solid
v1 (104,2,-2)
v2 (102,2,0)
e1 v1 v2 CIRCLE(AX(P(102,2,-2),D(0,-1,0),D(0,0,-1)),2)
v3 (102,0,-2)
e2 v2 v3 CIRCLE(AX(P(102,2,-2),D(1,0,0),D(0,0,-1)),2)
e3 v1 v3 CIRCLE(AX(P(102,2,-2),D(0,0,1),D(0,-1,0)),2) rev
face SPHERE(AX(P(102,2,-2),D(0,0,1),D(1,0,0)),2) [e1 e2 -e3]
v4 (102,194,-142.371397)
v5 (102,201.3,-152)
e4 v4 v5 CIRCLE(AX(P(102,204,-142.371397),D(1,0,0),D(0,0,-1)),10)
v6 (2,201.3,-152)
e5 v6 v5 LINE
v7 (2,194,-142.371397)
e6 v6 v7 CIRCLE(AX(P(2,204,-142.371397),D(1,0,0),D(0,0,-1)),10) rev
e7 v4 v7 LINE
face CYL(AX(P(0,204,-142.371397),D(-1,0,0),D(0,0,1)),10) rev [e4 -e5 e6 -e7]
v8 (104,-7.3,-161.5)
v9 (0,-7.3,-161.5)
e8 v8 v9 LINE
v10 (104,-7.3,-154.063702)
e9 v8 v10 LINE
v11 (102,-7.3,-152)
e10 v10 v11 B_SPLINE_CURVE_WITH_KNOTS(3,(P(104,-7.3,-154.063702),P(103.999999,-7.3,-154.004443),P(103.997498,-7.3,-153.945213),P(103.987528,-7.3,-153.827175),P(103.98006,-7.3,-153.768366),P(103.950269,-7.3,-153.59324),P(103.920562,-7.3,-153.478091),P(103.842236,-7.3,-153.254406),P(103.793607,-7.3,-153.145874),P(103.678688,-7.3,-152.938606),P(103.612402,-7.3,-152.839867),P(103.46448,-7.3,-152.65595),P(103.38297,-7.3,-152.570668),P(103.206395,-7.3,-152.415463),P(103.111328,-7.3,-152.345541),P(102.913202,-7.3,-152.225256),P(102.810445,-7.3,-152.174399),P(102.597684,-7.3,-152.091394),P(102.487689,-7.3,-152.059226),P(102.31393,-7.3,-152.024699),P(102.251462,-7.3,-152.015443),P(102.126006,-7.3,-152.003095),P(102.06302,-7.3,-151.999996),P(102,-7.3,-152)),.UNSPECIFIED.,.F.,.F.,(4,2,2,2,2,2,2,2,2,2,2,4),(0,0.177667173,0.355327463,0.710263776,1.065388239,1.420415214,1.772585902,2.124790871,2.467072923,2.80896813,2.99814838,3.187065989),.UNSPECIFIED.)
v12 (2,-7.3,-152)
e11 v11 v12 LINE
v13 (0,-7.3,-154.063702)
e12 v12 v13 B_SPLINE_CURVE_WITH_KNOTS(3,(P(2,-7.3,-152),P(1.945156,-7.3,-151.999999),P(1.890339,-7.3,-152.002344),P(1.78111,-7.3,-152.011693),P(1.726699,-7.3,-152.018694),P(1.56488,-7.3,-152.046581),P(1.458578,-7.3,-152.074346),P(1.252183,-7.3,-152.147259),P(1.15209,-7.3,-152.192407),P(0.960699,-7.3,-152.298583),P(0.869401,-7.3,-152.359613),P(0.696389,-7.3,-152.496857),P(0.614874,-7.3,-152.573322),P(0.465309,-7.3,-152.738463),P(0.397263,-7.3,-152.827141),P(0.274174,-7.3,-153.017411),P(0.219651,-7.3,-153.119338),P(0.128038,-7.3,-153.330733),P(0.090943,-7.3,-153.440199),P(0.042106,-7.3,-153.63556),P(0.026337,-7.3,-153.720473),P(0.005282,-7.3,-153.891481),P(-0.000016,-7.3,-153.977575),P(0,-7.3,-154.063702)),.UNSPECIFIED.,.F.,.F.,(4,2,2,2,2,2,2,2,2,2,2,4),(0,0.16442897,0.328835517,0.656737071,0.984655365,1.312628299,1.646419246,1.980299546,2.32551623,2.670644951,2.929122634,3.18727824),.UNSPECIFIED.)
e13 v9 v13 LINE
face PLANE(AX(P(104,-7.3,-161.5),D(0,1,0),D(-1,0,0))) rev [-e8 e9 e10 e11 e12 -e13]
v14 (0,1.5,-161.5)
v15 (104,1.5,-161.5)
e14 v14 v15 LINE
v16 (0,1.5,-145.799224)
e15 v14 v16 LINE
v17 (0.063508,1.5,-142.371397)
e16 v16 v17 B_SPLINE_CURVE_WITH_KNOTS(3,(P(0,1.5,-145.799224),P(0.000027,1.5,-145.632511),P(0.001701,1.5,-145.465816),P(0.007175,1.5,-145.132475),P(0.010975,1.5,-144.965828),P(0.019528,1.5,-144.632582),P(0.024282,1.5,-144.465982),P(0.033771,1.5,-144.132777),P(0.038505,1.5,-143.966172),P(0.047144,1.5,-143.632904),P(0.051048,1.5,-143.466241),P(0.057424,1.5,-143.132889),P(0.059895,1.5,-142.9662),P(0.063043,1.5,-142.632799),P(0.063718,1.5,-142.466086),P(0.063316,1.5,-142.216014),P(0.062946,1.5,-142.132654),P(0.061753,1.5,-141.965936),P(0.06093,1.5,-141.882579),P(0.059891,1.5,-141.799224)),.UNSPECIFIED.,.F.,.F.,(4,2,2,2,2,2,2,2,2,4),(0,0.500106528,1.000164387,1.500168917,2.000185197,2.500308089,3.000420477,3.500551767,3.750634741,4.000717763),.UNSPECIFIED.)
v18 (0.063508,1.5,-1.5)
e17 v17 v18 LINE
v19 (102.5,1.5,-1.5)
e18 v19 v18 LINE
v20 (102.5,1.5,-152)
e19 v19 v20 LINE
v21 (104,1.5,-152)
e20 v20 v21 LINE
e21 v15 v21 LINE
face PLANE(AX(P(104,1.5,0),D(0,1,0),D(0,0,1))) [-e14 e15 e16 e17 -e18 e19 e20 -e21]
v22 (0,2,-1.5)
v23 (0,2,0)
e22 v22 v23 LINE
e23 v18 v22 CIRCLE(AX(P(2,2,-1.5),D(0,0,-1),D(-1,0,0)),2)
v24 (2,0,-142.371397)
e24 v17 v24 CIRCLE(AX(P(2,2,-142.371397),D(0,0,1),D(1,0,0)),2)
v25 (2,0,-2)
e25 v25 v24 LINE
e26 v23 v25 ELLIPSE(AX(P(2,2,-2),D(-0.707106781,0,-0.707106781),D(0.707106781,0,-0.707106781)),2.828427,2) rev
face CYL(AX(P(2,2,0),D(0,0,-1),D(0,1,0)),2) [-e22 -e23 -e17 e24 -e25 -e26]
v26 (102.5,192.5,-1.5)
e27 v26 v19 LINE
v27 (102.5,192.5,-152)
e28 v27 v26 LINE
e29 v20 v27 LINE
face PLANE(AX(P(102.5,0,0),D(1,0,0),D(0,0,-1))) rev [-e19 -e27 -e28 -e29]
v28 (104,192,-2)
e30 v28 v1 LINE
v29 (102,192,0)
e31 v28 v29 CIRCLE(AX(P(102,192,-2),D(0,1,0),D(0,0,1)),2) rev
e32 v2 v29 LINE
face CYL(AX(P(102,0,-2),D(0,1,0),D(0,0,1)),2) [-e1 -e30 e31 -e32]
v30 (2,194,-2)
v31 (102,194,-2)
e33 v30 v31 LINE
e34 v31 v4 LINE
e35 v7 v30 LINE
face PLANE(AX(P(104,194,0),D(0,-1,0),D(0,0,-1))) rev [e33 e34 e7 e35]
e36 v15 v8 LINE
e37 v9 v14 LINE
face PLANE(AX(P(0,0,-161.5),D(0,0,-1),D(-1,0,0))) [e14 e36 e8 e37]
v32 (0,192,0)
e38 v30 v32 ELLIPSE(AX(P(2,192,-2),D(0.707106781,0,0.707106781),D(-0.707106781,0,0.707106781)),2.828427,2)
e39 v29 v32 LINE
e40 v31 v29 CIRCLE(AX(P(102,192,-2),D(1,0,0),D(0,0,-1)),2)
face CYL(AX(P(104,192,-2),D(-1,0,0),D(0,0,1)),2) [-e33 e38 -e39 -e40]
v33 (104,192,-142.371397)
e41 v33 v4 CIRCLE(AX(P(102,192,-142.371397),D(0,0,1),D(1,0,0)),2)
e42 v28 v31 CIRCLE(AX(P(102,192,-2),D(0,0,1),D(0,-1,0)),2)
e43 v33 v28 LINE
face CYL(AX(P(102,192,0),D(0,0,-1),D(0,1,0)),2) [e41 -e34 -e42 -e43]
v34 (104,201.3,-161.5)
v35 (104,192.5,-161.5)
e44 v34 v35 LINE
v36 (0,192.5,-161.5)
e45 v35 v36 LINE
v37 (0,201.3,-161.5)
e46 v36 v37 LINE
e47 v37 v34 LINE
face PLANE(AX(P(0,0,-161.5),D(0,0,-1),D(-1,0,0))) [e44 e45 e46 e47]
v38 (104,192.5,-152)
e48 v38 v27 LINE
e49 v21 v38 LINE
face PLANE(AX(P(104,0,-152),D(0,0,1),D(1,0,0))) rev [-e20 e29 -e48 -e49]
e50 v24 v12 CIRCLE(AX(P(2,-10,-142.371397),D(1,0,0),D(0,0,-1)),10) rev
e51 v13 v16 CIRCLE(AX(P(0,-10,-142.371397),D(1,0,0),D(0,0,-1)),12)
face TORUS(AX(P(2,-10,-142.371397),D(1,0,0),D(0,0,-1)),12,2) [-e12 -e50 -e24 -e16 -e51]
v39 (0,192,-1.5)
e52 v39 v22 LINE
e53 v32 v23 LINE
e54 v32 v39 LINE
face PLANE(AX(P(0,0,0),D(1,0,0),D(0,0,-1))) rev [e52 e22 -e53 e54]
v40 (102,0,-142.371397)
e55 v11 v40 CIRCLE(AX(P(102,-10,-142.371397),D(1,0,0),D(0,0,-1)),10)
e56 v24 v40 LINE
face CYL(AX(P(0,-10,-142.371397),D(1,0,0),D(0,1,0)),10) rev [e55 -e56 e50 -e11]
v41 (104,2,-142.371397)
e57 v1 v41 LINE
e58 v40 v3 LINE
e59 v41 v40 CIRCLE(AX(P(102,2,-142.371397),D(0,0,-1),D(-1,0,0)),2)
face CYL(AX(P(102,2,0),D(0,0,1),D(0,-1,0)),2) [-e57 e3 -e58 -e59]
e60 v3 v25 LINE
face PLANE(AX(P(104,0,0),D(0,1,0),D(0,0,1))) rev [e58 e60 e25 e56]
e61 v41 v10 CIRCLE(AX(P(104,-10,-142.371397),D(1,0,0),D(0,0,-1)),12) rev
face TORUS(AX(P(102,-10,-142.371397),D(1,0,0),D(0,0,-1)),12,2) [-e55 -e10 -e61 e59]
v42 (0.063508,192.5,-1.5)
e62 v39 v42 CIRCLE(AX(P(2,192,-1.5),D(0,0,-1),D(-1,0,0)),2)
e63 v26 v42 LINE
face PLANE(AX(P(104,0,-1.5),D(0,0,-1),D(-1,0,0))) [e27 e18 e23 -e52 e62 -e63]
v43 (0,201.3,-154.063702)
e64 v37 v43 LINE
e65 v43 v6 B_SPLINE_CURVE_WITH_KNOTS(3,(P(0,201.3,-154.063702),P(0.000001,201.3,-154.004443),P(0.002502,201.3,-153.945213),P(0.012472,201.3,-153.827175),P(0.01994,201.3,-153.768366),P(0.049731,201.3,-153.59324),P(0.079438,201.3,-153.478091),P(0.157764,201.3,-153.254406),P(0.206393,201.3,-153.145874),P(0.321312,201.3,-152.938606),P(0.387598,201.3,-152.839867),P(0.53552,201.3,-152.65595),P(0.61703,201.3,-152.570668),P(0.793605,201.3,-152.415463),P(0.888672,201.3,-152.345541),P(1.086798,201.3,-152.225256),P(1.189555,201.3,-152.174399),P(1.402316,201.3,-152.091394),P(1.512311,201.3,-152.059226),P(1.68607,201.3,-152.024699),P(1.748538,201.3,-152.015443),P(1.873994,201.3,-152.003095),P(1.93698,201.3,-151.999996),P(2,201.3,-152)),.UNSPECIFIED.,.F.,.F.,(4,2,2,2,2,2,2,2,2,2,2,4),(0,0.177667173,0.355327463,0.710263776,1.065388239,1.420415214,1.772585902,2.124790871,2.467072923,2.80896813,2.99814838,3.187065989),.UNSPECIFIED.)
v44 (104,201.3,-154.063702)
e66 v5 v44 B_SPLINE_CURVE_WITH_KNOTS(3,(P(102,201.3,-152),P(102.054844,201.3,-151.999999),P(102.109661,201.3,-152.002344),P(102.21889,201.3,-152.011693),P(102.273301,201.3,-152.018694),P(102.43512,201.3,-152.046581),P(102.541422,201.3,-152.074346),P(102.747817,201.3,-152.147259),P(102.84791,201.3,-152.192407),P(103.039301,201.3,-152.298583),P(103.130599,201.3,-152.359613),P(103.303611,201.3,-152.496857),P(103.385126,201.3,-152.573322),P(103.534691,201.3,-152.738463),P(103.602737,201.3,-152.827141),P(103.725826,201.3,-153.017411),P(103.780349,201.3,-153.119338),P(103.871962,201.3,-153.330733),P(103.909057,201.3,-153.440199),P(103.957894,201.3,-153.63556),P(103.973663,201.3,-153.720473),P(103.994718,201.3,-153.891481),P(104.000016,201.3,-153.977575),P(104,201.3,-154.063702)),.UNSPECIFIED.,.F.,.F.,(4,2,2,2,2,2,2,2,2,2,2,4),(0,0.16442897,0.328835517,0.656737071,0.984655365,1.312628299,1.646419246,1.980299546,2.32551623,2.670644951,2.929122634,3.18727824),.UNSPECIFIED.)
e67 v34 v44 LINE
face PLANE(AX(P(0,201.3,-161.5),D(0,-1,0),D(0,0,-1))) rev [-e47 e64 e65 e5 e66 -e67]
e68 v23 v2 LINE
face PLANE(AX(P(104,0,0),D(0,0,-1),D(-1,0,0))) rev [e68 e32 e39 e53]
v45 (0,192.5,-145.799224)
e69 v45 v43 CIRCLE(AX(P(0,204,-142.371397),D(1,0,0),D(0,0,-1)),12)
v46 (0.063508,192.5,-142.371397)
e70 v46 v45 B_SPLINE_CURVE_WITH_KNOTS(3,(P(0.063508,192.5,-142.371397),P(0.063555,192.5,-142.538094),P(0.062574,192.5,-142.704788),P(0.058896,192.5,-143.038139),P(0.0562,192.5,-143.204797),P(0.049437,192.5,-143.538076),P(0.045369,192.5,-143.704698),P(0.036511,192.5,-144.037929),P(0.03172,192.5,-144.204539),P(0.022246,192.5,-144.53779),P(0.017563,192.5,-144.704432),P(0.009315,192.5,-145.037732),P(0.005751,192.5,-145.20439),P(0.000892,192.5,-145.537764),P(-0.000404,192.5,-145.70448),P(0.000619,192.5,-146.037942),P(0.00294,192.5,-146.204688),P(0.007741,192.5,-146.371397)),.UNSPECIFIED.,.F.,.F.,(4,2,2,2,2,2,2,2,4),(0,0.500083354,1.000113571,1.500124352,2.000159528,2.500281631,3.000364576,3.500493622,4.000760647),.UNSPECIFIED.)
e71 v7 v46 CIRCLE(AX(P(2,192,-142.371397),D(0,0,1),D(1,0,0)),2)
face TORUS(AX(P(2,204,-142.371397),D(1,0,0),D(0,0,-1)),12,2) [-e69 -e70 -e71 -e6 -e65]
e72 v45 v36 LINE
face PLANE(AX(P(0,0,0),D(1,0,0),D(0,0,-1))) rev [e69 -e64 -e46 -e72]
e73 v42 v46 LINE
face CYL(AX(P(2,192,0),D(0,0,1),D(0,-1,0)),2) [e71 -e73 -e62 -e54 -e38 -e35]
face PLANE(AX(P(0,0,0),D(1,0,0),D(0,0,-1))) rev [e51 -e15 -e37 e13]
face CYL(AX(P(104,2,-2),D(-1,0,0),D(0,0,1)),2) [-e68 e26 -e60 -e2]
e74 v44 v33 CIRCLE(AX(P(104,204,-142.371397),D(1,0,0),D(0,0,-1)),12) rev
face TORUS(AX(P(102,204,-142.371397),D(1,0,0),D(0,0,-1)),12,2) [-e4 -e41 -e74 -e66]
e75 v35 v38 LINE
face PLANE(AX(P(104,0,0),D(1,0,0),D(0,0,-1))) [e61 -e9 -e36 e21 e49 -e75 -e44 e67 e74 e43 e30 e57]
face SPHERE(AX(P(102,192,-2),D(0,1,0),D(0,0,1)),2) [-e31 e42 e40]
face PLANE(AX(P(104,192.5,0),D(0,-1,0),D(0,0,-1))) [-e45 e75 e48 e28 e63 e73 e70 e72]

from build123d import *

# Parameters (mm, degrees)
SKETCH1_W           = 194
SKETCH1_H           = 152
BOSS_EXTRUDE1_DEPTH = 104
SHELL1_T            = -1.5
CUT_EXTRUDE1_DEPTH  = 2
SKETCH4_W           = 104
SKETCH4_H           = 8.8
BOSS_EXTRUDE2_DEPTH = 9.5
FILLET1_R           = 10
FILLET2_R           = 2


with BuildPart() as part:
    # Sketch1 → Boss-Extrude1 (new body)
    with BuildSketch(Plane.YZ):
        with Locations((97, -76)):
            Rectangle(SKETCH1_W, SKETCH1_H)
    extrude(amount=BOSS_EXTRUDE1_DEPTH)

    # Shell1
    shell1_openings = [part.faces().sort_by_distance(p)[0] for p in [
        (52, 97, -152),
    ]]
    offset(amount=SHELL1_T, openings=shell1_openings, kind=Kind.INTERSECTION)

    # Sketch2 → Cut-Extrude1 (cut)
    with BuildSketch(Plane(origin=(0, 0, 0), x_dir=(0, -1, 0), z_dir=(-1, 0, 0))):
        Polygon((-192.5, -1.5), (-192.5, -150.5), (-192.5, -152), (-1.5, -152), (-1.5, -150.5), (-1.5, -1.5), align=None)
    extrude(amount=-CUT_EXTRUDE1_DEPTH, mode=Mode.SUBTRACT)

    # Sketch4 → Boss-Extrude2 (add)
    with BuildSketch(Plane(origin=(0, 0, -152), x_dir=(1, 0, 0), z_dir=(0, 0, -1))):
        with Locations((52, 2.9)):
            Rectangle(SKETCH4_W, SKETCH4_H)
        with Locations((52, -196.9)):
            Rectangle(SKETCH4_W, SKETCH4_H)
    extrude(amount=BOSS_EXTRUDE2_DEPTH)

    # Fillet1
    # the kernel refuses this fillet: 10 mm, written as the material it adds along each edge
    with BuildSketch(Plane(origin=(0, 0, -152), x_dir=(0, -1, 0), z_dir=(1, 0, 0))) as fillet1_piece_1:
        with BuildLine():
            CenterArc((10, -9.628603222), FILLET1_R, 105.664266851, 74.335733149)
            Line((0, -9.628603222), (-0.2, -9.628603222))
            Line((-0.2, -9.628603222), (-0.2, 0))
            Line((-0.2, 0), (0, 0.2))
            ThreePointArc((0, 0.2), (3.65, 0.2), (7.246, 0.192572064))
            Line((7.246, 0.192572064), (7.3, 0))
        make_face()
    extrude(amount=104)
    with BuildSketch(Plane(origin=(0, 194, -152), x_dir=(0, 1, 0), z_dir=(1, 0, 0))) as fillet1_piece_2:
        with BuildLine():
            CenterArc((10, 9.628603222), FILLET1_R, 180, 74.335733149)
            Line((0, 9.628603222), (-0.2, 9.628603222))
            Line((-0.2, 9.628603222), (-0.2, 0))
            Line((-0.2, 0), (0, -0.2))
            ThreePointArc((0, -0.2), (3.65, -0.2), (7.246, -0.192572064))
            Line((7.246, -0.192572064), (7.3, 0))
        make_face()
    extrude(amount=104)

    # Fillet2
    # the kernel refuses this fillet: 2 mm, written as the material it takes off along each edge
    with BuildSketch(Plane(origin=(102, 2, -2), x_dir=(1, 0, 0), z_dir=(0, -1, 0))) as fillet2_piece_1_section:
        Polygon((0, 0), (FILLET2_R, 0), (FILLET2_R, FILLET2_R), (0, FILLET2_R), align=None)
    fillet2_piece_1 = extrude(amount=FILLET2_R, mode=Mode.PRIVATE)
    fillet2_piece_1 = fillet2_piece_1 - Plane(origin=(102, 2, -2), x_dir=(-0.7071067811865475, 0, -0.7071067811865475), z_dir=(0, -1, 0)) * Sphere(FILLET2_R, mode=Mode.PRIVATE)
    add(fillet2_piece_1, mode=Mode.SUBTRACT)
    with BuildSketch(Plane(origin=(102, 192, -2), x_dir=(1, 0, 0), z_dir=(0, 1, 0))) as fillet2_piece_2_section:
        Polygon((0, 0), (FILLET2_R, 0), (FILLET2_R, -FILLET2_R), (0, -FILLET2_R), align=None)
    fillet2_piece_2 = extrude(amount=FILLET2_R, mode=Mode.PRIVATE)
    fillet2_piece_2 = fillet2_piece_2 - Plane(origin=(102, 192, -2), x_dir=(-0.7071067811865475, 0, -0.7071067811865475), z_dir=(0, 1, 0)) * Sphere(FILLET2_R, mode=Mode.PRIVATE)
    add(fillet2_piece_2, mode=Mode.SUBTRACT)
    with BuildSketch(Plane(origin=(104, 2, 0), x_dir=(0, 0, -1), z_dir=(0, 1, 0))) as fillet2_piece_3:
        with BuildLine():
            CenterArc((FILLET2_R, FILLET2_R), FILLET2_R, 180, 90)
            Line((0, FILLET2_R), (0, 0))
            Line((0, 0), (FILLET2_R, 0))
        make_face()
    extrude(amount=190, mode=Mode.SUBTRACT)
    with BuildSketch(Plane(origin=(104, 0, -142.371396778), x_dir=(0, 1, 0), z_dir=(0, 0, 1))) as fillet2_piece_4:
        with BuildLine():
            CenterArc((FILLET2_R, FILLET2_R), FILLET2_R, 180, 90)
            Line((0, FILLET2_R), (0, 0))
            Line((0, 0), (FILLET2_R, 0))
        make_face()
    extrude(amount=140.371396778, mode=Mode.SUBTRACT)
    with BuildSketch(Plane(origin=(0, 0, -142.371396778), x_dir=(0, 1, 0), z_dir=(0, 0, 1))) as fillet2_piece_5:
        with BuildLine():
            CenterArc((FILLET2_R, -FILLET2_R), FILLET2_R, 90, 90)
            Line((0, -FILLET2_R), (0, 0))
            Line((0, 0), (FILLET2_R, 0))
        make_face()
    extrude(amount=147.371396778, mode=Mode.SUBTRACT)
    with BuildSketch(Plane(origin=(-5, 0, 0), x_dir=(0, 1, 0), z_dir=(1, 0, 0)), Plane(origin=(-5, 194, 0), x_dir=(0, 0, -1), z_dir=(1, 0, 0))) as fillet2_piece_6:
        with BuildLine():
            CenterArc((FILLET2_R, -FILLET2_R), FILLET2_R, 90, 90)
            Line((0, -FILLET2_R), (0, 0))
            Line((0, 0), (FILLET2_R, 0))
        make_face()
    extrude(amount=107, mode=Mode.SUBTRACT)
    with BuildSketch(Plane(origin=(0, 194, 5), x_dir=(1, 0, 0), z_dir=(0, 0, -1))) as fillet2_piece_7:
        with BuildLine():
            CenterArc((FILLET2_R, FILLET2_R), FILLET2_R, 180, 90)
            Line((0, FILLET2_R), (0, 0))
            Line((0, 0), (FILLET2_R, 0))
        make_face()
    extrude(amount=147.371396778, mode=Mode.SUBTRACT)
    with BuildSketch(Plane(origin=(104, 194, -2), x_dir=(-1, 0, 0), z_dir=(0, 0, -1))) as fillet2_piece_8:
        with BuildLine():
            CenterArc((FILLET2_R, -FILLET2_R), FILLET2_R, 90, 90)
            Line((0, -FILLET2_R), (0, 0))
            Line((0, 0), (FILLET2_R, 0))
        make_face()
    extrude(amount=140.371396778, mode=Mode.SUBTRACT)
    with BuildSketch(Plane(origin=(0, -10, -142.371396778), x_dir=(0, -0.2248060419259851, -0.9744035321742077), z_dir=(0, -0.9744035321742077, 0.2248060419259851))) as fillet2_piece_9:
        with BuildLine():
            CenterArc((10 + FILLET2_R, FILLET2_R), FILLET2_R, 180, 90)
            Line((10, FILLET2_R), (10, 0))
            Line((10, 0), (10 + FILLET2_R, 0))
        make_face()
    revolve(axis=Axis((0, -10, -142.371396778), (1, 0, 0)), revolution_arc=102.991472997, mode=Mode.SUBTRACT)
    with BuildSketch(Plane(origin=(104, -10, -142.371396778), x_dir=(0, -0.2248060419259851, -0.9744035321742077), z_dir=(0, -0.9744035321742077, 0.2248060419259851))) as fillet2_piece_10:
        with BuildLine():
            CenterArc((10 + FILLET2_R, -FILLET2_R), FILLET2_R, 90, 90)
            Line((10, -FILLET2_R), (10, 0))
            Line((10, 0), (10 + FILLET2_R, 0))
        make_face()
    revolve(axis=Axis((104, -10, -142.371396778), (1, 0, 0)), revolution_arc=102.991472997, mode=Mode.SUBTRACT)
    with BuildSketch(Plane(origin=(0, 204, -142.371396778), x_dir=(0, -1, 0), z_dir=(0, 0, 1))) as fillet2_piece_11:
        with BuildLine():
            CenterArc((10 + FILLET2_R, FILLET2_R), FILLET2_R, 180, 90)
            Line((10 + FILLET2_R, 0), (10, 0))
            Line((10, 0), (10, FILLET2_R))
        make_face()
    revolve(axis=Axis((0, 204, -142.371396778), (1, 0, 0)), revolution_arc=102.991472997, mode=Mode.SUBTRACT)
    with BuildSketch(Plane(origin=(104, 204, -142.371396778), x_dir=(0, -1, 0), z_dir=(0, 0, 1))) as fillet2_piece_12:
        with BuildLine():
            CenterArc((10 + FILLET2_R, -FILLET2_R), FILLET2_R, 90, 90)
            Line((10 + FILLET2_R, 0), (10, 0))
            Line((10, 0), (10, -FILLET2_R))
        make_face()
    revolve(axis=Axis((104, 204, -142.371396778), (1, 0, 0)), revolution_arc=102.991472997, mode=Mode.SUBTRACT)


solid = part.part
